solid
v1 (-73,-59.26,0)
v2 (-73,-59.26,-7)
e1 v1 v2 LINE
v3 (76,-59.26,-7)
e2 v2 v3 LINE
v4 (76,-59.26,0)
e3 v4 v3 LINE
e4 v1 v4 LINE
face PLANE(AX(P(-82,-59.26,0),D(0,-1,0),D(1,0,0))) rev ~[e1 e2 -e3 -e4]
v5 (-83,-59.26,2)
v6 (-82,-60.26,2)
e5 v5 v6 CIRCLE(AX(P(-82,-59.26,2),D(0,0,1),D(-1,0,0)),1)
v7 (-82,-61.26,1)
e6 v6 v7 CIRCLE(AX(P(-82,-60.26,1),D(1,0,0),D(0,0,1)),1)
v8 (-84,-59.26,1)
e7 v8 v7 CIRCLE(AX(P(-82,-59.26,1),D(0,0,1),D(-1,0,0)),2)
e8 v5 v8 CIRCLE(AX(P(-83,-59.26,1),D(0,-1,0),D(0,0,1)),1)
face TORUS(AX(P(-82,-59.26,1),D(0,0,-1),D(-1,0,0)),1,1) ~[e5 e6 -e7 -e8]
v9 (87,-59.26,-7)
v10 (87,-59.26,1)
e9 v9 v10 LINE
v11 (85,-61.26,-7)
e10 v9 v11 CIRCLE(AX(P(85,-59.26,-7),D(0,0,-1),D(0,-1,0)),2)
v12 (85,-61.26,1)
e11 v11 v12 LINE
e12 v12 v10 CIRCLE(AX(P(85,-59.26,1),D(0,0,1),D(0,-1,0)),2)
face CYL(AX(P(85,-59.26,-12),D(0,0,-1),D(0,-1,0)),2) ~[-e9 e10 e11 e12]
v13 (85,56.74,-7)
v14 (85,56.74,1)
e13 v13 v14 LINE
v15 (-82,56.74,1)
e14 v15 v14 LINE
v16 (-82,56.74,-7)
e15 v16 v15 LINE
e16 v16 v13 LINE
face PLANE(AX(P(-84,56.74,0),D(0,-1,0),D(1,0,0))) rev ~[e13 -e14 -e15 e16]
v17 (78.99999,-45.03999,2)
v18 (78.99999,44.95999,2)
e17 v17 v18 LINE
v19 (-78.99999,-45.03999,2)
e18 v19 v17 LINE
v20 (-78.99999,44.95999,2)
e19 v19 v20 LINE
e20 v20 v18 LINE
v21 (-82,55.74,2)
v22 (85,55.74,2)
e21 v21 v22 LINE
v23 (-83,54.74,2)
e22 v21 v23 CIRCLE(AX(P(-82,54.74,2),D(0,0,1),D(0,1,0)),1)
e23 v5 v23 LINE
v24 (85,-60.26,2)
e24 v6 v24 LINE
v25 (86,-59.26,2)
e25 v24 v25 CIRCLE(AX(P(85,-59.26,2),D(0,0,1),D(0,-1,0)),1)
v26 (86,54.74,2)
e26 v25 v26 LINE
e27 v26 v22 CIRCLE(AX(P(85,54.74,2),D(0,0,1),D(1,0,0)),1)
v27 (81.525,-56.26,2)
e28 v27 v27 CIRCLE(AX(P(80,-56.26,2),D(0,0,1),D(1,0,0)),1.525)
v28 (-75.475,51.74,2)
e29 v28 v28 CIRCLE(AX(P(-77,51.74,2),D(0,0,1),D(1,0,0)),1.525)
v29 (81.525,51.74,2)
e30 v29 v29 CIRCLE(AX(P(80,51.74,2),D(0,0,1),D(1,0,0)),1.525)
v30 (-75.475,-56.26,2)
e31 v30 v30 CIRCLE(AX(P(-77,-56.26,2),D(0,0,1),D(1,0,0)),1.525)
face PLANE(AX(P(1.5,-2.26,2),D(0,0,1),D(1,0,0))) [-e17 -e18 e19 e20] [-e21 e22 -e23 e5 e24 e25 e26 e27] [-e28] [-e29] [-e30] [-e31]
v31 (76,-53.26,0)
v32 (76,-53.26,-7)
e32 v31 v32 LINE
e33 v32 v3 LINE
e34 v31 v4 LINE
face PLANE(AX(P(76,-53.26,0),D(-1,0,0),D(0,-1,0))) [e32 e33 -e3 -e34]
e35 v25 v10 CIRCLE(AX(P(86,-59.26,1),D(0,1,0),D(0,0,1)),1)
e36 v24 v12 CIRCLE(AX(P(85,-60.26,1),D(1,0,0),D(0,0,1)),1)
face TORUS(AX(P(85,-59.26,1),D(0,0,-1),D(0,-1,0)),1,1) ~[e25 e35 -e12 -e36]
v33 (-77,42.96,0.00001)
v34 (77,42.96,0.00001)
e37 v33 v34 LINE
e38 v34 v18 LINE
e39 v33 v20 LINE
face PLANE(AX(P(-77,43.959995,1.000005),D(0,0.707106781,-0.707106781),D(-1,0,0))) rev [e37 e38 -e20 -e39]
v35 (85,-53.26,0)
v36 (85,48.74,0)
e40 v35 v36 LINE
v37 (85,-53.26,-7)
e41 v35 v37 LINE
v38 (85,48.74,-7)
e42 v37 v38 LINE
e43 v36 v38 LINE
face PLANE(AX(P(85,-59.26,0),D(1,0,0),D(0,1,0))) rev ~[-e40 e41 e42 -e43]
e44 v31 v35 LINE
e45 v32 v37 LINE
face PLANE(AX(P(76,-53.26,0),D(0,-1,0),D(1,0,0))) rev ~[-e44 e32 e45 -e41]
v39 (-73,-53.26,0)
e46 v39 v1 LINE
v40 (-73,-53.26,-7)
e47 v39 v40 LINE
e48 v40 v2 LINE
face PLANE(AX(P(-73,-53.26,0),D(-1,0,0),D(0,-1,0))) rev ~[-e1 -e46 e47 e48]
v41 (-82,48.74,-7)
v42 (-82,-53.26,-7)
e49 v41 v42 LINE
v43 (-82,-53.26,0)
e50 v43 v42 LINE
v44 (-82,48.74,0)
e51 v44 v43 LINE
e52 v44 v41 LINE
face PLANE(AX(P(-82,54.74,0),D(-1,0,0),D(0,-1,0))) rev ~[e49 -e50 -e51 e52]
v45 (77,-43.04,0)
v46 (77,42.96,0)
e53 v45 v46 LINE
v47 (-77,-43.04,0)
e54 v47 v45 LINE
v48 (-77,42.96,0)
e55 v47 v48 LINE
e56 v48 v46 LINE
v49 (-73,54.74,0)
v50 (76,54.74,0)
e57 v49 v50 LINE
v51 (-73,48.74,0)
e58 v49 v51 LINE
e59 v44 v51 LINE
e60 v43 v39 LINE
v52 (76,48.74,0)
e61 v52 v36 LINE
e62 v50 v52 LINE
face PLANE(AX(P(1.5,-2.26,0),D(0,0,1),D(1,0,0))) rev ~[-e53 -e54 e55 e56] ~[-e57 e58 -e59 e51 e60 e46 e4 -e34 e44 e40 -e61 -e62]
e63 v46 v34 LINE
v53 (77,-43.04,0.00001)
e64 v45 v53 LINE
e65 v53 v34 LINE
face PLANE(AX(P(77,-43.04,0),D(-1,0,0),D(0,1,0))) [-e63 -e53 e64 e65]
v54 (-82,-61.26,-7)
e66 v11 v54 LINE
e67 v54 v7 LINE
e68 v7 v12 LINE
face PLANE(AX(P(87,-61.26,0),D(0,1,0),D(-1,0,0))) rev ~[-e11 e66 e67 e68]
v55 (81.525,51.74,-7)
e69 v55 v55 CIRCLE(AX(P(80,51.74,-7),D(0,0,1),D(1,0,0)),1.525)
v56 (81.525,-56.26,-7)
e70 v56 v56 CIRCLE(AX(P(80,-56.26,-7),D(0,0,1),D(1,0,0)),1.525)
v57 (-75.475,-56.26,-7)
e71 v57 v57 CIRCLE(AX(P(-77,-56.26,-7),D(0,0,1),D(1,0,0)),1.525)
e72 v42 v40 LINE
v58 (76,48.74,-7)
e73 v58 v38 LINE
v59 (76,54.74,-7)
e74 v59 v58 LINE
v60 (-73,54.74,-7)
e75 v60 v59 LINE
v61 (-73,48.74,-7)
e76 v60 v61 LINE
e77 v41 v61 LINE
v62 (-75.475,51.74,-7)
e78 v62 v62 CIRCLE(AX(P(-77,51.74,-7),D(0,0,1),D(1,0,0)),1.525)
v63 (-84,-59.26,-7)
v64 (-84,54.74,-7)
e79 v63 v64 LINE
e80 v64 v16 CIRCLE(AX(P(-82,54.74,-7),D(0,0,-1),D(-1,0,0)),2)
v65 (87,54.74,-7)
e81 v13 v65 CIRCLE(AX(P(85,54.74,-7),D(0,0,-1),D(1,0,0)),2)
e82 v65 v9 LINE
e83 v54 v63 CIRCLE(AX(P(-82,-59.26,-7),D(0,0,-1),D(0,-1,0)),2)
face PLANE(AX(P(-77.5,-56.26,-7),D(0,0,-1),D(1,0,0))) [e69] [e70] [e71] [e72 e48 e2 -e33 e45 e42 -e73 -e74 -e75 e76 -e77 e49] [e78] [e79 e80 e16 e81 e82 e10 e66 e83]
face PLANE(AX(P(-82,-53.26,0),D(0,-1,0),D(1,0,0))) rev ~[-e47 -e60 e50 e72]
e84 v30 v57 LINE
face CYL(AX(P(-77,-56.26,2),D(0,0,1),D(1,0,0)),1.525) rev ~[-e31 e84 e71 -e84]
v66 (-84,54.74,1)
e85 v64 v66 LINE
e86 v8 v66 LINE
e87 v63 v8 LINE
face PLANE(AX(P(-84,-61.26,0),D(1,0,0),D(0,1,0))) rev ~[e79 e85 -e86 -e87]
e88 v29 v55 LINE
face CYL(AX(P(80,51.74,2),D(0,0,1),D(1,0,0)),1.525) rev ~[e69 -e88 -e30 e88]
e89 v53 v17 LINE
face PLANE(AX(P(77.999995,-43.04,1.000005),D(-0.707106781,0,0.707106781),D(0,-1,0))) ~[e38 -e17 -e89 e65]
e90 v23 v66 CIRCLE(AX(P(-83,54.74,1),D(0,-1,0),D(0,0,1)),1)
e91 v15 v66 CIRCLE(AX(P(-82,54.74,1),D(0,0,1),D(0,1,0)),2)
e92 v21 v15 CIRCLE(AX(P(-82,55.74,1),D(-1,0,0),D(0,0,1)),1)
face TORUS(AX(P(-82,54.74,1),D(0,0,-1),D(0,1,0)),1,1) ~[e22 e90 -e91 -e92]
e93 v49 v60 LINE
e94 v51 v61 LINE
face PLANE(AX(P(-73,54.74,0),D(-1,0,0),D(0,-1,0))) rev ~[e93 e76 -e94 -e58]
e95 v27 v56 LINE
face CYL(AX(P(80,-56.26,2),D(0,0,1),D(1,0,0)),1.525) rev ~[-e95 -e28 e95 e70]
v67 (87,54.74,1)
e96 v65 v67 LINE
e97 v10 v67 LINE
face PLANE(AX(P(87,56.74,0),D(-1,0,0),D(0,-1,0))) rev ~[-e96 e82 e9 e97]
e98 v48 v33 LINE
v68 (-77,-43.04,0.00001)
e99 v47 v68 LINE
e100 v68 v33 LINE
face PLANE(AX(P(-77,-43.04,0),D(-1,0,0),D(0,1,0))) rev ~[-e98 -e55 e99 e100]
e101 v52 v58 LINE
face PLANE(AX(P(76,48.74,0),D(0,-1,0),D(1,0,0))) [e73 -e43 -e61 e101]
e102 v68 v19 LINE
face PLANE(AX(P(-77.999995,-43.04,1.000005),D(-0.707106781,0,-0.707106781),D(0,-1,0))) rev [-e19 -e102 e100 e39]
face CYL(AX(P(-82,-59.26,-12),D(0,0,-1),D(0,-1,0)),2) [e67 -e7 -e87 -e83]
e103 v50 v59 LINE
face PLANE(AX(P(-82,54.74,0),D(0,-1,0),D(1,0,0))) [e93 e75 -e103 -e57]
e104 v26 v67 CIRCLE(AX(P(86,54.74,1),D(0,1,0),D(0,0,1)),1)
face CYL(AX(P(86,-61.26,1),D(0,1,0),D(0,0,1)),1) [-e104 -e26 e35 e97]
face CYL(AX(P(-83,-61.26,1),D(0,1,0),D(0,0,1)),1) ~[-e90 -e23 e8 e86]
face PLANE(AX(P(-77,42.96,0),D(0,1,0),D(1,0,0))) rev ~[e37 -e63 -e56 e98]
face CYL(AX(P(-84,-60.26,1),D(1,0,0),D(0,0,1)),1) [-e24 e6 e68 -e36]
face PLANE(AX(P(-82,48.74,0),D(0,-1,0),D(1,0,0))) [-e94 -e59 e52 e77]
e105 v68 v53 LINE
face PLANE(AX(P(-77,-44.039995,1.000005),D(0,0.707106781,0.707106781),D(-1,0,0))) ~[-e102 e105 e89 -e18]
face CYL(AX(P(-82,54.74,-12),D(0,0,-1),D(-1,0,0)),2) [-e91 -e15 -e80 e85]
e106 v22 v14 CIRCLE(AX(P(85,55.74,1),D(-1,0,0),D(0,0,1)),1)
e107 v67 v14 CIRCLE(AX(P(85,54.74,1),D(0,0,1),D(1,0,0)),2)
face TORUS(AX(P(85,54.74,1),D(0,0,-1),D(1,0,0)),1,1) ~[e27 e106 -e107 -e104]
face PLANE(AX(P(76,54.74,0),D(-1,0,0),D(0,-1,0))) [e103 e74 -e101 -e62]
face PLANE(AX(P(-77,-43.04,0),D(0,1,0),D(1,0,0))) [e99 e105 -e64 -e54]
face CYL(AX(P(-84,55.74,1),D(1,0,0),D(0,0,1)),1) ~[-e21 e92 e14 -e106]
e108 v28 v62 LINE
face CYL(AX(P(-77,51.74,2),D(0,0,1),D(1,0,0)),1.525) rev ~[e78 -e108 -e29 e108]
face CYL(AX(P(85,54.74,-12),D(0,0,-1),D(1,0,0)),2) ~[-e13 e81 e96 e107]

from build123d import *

# Parameters (mm, degrees)
F0_W          = 171
F0_H          = 118
F0_W_2        = 154
F0_H_2        = 86
F1_DEPTH      = 2
F2_SIZE       = 1.99999
F3_R          = 1
F4_W          = 167
F4_H          = 2
F5_DEPTH      = 7
F6_W          = 9
F6_H          = 6
F7_DEPTH      = 7
F8_R          = 1.525
F9_DEPTH      = 9.001
F10_T1_DEPTH  = 14
F10_T4_ANGLE  = 90
F10_T6_ANGLE  = 90
F10_T8_ANGLE  = 90
F10_T10_ANGLE = 90


# Not quite as in the source:
# - a fillet or chamfer that OpenCascade refuses, or shapes differently, is made with other operations: its cross-section is extruded or revolved along the edge and cut away or added
# - a fillet or chamfer is up to 0.001 mm smaller than in the source, because OpenCascade refuses the exact size


with BuildPart() as f1:
    # F0 (on Top) → F1 (new body)
    with BuildSketch(Plane.XY):
        with Locations((1.5, -2.26)):
            Rectangle(F0_W, F0_H)
        with Locations((0, -0.04)):
            Rectangle(F0_W_2, F0_H_2, mode=Mode.SUBTRACT)
    extrude(amount=F1_DEPTH)

    # F2 (size 2 in the source; OpenCascade refuses exactly that, so slightly less here)
    f2_edges = [f1.edges().sort_by_distance(p)[0] for p in [
        (0, 42.96, 2),
        (77, -0.04, 2),
        (-77, -0.04, 2),
        (0, -43.04, 2),
    ]]
    chamfer(f2_edges, length=F2_SIZE)

    # F3
    f3_edges = [f1.edges().sort_by_distance(p)[0] for p in [
        (1.5, -61.26, 2),
        (87, -2.26, 2),
        (1.5, 56.74, 2),
        (-84, -2.26, 2),
    ]]
    fillet(f3_edges, radius=F3_R)

    # F4 (on face) → F5 (join)
    with BuildSketch(Plane(origin=(0, 0, 0), x_dir=(1, 0, 0), z_dir=(0, 0, -1))):
        Polygon((-82, 59.26), (-82, 61.26), (-84, 61.26), (-84, -56.74), (-82, -56.74), (-82, -54.74), align=None)
        Polygon((87, 61.26), (85, 61.26), (85, 59.26), (85, -54.74), (85, -56.74), (87, -56.74), align=None)
        with Locations((1.5, 60.26)):
            Rectangle(F4_W, F4_H)
        with Locations((1.5, -55.74)):
            Rectangle(F4_W, F4_H)
    extrude(amount=F5_DEPTH)

    # F6 (on face) → F7 (join)
    with BuildSketch(Plane(origin=(0, 0, 0), x_dir=(1, 0, 0), z_dir=(0, 0, -1))):
        with Locations((-77.5, 56.26)):
            Rectangle(F6_W, F6_H)
        with Locations((80.5, 56.26)):
            Rectangle(F6_W, F6_H)
        with Locations((80.5, -51.74)):
            Rectangle(F6_W, F6_H)
        with Locations((-77.5, -51.74)):
            Rectangle(F6_W, F6_H)
    extrude(amount=F7_DEPTH)

    # F8 (on face) → F9 (cut, through all)
    with BuildSketch(Plane.XY.offset(2)):
        with Locations((-77, 51.74)):
            Circle(F8_R)
        with Locations((80, 51.74)):
            Circle(F8_R)
        with Locations((80, -56.26)):
            Circle(F8_R)
        with Locations((-77, -56.26)):
            Circle(F8_R)
    extrude(amount=-F9_DEPTH, mode=Mode.SUBTRACT)

    # F10: fillet of radius 2 on 4 edges, made by hand

    # F10_s2 → F10_t1 (cut)
    with BuildSketch(Plane.XY.offset(-12)):
        with BuildLine():
            ThreePointArc((-84, 54.74), (-83.4142135624, 56.1542135624), (-82, 56.74))
            Line((-82, 56.74), (-84, 56.74))
            Line((-84, 56.74), (-84, 54.74))
        make_face()
        with BuildLine():
            ThreePointArc((87, 54.74), (86.4142135624, 56.1542135624), (85, 56.74))
            Line((85, 56.74), (87, 56.74))
            Line((87, 56.74), (87, 54.74))
        make_face()
        with BuildLine():
            ThreePointArc((85, -61.26), (86.4142135624, -60.6742135624), (87, -59.26))
            Line((87, -59.26), (87, -61.26))
            Line((87, -61.26), (85, -61.26))
        make_face()
        with BuildLine():
            ThreePointArc((-82, -61.26), (-83.4142135624, -60.6742135624), (-84, -59.26))
            Line((-84, -59.26), (-84, -61.26))
            Line((-84, -61.26), (-82, -61.26))
        make_face()
    extrude(amount=F10_T1_DEPTH, mode=Mode.SUBTRACT)

    # F10_s3 → F10_t4 (revolve, cut)
    with BuildSketch(Plane.XZ.offset(59.26)):
        with BuildLine():
            ThreePointArc((-83, 2), (-83.7071067812, 1.7071067812), (-84, 1))
            Line((-84, 1), (-84, 2))
            Line((-84, 2), (-83, 2))
        make_face()
    revolve(axis=Axis((-82, -59.26, 2), (0, 0, 1)), revolution_arc=F10_T4_ANGLE, mode=Mode.SUBTRACT)

    # F10_s5 → F10_t6 (revolve, cut)
    with BuildSketch(Plane.YZ.offset(85)):
        with BuildLine():
            ThreePointArc((-60.26, 2), (-60.9671067812, 1.7071067812), (-61.26, 1))
            Line((-61.26, 1), (-61.26, 2))
            Line((-61.26, 2), (-60.26, 2))
        make_face()
    revolve(axis=Axis((85, -59.26, 2), (0, 0, 1)), revolution_arc=F10_T6_ANGLE, mode=Mode.SUBTRACT)

    # F10_s7 → F10_t8 (revolve, cut)
    with BuildSketch(Plane.XZ.offset(-54.74)):
        with BuildLine():
            ThreePointArc((86, 2), (86.7071067812, 1.7071067812), (87, 1))
            Line((87, 1), (87, 2))
            Line((87, 2), (86, 2))
        make_face()
    revolve(axis=Axis((85, 54.74, 2), (0, 0, 1)), revolution_arc=F10_T8_ANGLE, mode=Mode.SUBTRACT)

    # F10_s9 → F10_t10 (revolve, cut)
    with BuildSketch(Plane.YZ.offset(-82)):
        with BuildLine():
            ThreePointArc((55.74, 2), (56.4471067812, 1.7071067812), (56.74, 1))
            Line((56.74, 1), (56.74, 2))
            Line((56.74, 2), (55.74, 2))
        make_face()
    revolve(axis=Axis((-82, 54.74, 2), (0, 0, 1)), revolution_arc=F10_T10_ANGLE, mode=Mode.SUBTRACT)


solid = f1.part
